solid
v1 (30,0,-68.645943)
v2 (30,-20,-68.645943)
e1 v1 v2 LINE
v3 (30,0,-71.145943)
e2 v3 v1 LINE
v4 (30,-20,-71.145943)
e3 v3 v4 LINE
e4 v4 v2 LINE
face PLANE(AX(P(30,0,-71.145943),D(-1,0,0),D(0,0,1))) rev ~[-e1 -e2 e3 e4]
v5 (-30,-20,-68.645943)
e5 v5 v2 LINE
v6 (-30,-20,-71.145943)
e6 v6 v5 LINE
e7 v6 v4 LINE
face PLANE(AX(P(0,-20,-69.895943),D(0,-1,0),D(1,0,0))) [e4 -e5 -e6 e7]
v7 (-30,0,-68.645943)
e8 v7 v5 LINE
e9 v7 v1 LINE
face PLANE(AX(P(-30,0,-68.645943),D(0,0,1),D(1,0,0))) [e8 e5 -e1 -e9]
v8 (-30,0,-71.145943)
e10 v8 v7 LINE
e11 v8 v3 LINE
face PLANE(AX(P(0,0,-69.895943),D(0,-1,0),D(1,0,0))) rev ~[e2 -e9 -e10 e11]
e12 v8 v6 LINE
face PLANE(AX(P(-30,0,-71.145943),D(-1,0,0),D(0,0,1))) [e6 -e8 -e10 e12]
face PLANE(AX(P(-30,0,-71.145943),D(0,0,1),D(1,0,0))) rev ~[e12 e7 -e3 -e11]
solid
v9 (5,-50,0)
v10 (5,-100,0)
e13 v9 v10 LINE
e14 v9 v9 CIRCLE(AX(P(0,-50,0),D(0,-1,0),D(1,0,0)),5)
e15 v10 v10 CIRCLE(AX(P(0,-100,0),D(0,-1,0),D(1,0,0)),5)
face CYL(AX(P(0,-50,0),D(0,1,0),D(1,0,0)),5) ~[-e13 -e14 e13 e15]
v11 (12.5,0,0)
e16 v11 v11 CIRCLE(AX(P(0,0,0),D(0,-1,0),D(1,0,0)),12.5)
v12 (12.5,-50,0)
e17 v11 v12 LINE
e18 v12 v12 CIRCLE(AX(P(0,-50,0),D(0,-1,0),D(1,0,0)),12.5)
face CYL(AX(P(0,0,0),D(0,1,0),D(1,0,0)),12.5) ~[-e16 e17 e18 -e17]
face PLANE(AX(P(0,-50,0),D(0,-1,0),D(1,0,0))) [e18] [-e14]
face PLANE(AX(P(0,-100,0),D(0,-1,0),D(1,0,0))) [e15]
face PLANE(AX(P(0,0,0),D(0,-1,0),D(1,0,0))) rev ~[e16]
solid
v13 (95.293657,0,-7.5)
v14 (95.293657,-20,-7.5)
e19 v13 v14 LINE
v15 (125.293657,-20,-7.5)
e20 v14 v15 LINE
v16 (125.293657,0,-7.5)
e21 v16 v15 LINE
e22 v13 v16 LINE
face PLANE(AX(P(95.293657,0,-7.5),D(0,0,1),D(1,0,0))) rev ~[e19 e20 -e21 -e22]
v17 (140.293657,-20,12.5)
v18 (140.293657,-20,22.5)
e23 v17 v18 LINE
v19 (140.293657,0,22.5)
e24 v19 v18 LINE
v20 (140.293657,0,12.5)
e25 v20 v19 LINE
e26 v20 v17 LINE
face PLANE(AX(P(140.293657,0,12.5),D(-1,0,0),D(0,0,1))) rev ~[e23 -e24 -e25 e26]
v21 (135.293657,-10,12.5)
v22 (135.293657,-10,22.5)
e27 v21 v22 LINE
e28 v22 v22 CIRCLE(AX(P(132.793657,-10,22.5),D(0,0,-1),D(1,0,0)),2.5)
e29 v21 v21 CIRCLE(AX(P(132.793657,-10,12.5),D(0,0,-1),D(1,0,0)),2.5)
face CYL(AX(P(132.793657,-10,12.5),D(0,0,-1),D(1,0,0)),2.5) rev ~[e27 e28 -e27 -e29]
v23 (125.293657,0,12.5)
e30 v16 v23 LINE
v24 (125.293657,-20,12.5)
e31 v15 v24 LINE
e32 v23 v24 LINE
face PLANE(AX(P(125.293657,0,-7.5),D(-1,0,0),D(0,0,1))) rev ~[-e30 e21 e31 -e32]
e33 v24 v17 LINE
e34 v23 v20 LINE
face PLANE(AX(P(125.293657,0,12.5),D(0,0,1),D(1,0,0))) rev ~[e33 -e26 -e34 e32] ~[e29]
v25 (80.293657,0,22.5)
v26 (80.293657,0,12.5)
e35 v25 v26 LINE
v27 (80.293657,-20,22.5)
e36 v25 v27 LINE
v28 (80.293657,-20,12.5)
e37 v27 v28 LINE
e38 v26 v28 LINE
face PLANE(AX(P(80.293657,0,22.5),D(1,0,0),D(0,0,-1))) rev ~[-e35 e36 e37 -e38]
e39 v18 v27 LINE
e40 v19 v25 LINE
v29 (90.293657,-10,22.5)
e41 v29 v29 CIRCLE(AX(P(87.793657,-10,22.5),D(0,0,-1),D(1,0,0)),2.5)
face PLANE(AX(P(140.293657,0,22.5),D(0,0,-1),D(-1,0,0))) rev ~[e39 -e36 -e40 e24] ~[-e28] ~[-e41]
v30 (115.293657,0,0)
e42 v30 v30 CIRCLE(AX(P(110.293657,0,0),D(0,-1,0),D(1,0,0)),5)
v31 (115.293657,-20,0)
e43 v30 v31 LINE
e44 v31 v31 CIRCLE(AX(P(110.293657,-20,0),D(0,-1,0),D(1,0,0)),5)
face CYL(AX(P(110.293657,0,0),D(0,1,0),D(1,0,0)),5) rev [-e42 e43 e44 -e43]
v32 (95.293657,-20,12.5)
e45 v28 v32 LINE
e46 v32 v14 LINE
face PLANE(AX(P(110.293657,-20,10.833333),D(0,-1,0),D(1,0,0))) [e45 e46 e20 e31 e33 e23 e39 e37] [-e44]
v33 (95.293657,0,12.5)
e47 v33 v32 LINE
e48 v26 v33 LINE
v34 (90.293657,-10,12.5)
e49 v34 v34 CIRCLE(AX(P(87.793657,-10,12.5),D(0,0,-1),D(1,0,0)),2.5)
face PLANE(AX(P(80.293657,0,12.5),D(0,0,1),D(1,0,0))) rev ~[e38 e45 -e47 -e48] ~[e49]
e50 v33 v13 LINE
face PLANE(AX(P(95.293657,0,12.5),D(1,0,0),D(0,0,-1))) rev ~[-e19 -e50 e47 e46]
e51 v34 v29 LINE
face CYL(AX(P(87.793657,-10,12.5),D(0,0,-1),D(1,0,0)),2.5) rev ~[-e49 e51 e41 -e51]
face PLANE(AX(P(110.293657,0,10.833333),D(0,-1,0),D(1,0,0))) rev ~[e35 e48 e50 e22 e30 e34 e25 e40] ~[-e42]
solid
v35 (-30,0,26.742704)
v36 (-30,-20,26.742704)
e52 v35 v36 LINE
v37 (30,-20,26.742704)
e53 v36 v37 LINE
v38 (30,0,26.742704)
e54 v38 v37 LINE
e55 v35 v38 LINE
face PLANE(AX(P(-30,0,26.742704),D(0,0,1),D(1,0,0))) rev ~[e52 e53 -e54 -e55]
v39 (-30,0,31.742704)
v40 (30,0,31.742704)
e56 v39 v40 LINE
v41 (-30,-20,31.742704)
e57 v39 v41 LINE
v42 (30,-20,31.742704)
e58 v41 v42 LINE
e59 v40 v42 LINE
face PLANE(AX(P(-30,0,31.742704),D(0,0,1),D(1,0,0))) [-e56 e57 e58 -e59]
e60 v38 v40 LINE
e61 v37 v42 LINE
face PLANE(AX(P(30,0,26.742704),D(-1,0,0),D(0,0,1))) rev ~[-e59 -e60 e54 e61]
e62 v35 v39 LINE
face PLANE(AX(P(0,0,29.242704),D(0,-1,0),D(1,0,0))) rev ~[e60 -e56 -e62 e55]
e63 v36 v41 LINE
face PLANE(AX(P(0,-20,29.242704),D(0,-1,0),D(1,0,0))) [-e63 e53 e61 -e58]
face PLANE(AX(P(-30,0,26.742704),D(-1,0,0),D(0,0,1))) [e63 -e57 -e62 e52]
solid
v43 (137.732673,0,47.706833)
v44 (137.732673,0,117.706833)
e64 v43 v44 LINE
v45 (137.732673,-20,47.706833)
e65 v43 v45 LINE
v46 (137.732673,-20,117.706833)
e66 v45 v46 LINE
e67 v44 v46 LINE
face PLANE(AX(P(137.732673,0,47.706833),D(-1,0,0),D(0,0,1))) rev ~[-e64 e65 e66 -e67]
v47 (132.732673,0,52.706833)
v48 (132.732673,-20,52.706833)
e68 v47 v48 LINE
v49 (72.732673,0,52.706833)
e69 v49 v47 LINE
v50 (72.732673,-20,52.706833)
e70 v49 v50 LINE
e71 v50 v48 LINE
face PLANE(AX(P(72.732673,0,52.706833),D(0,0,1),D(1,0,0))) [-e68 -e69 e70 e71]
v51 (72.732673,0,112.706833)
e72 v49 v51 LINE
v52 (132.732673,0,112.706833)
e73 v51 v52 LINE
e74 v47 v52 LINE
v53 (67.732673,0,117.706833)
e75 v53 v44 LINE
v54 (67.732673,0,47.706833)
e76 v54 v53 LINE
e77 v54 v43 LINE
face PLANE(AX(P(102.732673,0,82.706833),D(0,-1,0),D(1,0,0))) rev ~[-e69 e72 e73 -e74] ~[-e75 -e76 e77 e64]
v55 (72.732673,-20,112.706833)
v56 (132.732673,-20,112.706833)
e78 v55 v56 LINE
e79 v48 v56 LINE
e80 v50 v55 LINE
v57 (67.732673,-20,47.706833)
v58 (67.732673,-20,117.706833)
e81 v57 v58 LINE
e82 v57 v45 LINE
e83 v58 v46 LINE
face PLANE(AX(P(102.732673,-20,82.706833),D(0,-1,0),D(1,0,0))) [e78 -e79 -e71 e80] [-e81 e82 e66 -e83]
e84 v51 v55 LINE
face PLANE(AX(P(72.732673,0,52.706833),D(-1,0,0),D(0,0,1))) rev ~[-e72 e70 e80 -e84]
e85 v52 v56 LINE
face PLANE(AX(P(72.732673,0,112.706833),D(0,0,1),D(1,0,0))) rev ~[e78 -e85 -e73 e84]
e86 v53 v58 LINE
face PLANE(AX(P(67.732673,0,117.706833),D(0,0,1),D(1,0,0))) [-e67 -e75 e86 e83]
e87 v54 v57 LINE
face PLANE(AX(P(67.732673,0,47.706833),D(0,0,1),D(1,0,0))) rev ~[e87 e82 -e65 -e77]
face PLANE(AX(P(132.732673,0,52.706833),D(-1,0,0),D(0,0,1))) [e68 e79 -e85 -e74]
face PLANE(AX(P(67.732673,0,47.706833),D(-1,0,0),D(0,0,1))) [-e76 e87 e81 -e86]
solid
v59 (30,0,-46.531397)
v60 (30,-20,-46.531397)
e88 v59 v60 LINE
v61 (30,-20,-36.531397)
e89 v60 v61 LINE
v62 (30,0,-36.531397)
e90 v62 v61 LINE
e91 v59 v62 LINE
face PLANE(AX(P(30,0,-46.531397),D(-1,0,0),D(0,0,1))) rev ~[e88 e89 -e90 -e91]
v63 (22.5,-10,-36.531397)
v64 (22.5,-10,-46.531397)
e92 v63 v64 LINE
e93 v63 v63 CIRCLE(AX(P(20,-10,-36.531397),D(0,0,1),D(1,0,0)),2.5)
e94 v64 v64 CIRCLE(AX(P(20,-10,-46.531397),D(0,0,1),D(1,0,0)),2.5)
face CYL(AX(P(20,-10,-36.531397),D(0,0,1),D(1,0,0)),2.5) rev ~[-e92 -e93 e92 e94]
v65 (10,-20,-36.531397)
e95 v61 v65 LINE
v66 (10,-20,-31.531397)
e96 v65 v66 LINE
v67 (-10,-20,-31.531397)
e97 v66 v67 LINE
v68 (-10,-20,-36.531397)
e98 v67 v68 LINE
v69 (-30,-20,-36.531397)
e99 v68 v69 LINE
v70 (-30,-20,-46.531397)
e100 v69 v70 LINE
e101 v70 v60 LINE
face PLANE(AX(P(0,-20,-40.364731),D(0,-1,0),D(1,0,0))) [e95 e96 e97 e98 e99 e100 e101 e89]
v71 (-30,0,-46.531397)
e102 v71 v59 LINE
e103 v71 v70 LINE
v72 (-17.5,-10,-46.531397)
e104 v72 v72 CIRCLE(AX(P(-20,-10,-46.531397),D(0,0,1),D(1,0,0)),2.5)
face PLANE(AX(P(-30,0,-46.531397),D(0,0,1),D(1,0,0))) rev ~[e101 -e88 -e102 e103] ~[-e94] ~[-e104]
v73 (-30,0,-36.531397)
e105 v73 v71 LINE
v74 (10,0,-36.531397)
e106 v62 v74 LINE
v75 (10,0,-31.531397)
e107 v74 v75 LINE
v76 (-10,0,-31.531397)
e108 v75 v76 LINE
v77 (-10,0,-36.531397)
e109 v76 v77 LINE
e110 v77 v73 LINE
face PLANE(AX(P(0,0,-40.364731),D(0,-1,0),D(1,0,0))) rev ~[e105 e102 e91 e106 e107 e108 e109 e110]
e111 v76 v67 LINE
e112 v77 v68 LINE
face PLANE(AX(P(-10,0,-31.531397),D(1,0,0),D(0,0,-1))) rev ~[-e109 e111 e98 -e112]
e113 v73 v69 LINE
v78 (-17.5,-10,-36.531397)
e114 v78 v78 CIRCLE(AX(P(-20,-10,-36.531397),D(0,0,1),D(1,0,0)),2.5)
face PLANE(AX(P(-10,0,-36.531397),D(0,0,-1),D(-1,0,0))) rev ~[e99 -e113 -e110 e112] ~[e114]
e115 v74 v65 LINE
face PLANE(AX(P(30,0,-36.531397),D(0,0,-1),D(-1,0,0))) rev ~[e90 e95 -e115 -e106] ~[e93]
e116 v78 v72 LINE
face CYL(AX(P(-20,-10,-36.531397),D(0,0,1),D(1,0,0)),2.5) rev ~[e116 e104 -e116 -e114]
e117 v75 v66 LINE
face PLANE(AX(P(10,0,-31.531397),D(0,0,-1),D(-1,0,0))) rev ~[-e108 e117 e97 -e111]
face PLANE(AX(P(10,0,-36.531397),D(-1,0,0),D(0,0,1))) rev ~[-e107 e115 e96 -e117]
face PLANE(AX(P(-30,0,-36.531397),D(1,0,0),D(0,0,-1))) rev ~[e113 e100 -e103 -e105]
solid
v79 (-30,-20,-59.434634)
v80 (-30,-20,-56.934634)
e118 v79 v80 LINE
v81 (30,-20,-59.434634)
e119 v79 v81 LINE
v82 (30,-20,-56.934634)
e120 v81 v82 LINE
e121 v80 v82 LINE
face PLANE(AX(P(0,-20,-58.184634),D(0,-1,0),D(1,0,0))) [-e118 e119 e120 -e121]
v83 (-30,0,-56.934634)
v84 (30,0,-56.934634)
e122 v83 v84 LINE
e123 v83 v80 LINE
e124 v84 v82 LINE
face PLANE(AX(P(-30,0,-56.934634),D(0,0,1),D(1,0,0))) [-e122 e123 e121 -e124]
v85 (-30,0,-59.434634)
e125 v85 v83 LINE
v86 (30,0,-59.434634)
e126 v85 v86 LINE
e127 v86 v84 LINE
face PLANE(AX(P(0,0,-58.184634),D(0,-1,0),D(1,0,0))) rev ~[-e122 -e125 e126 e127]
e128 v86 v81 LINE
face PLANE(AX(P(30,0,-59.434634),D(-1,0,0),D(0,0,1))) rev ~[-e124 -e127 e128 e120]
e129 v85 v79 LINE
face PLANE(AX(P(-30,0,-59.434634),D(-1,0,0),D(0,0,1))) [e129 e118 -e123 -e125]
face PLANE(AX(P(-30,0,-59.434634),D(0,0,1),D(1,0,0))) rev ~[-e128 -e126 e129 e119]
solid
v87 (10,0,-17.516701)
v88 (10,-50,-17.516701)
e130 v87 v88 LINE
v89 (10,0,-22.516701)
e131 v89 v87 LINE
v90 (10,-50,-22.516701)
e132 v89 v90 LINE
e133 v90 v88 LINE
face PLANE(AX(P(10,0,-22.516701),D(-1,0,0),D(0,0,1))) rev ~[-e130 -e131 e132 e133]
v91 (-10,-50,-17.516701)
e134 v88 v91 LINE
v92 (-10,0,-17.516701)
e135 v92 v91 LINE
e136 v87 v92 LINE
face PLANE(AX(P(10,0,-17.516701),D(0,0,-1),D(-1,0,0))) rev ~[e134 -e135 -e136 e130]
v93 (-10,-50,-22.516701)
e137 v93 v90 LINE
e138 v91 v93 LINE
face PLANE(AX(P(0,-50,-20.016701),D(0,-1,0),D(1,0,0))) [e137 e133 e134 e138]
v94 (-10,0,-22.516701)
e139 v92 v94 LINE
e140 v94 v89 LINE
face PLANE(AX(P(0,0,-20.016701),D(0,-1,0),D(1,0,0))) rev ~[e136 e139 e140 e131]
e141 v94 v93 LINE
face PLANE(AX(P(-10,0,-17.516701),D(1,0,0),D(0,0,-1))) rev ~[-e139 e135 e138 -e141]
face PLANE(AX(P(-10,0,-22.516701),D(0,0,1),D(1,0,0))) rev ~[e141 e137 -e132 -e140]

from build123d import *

# Parameters (mm, degrees)
F0_R      = 5
F1_DEPTH  = 20
F0_W      = 60
F0_H      = 5
F0_W_2    = 70
F0_H_2    = 70
F0_H_3    = 60
F0_H_4    = 2.5
F0_R_2    = 12.5
F2_DEPTH  = 50
F3_R      = 5
F4_DEPTH  = 50
F5_DEPTH  = 50
F6_R      = 2.5
F7_R      = 2.5
F8_DEPTH  = 25
F10_R     = 2.5
F9_R      = 2.5
F11_DEPTH = 25


# Not quite as in the source:
# - a feature of the source that left no trace in its solid (it failed there, or was rolled back) is left out


with BuildPart() as f1:
    # F0 (on Front) → F1 (new body)
    with BuildSketch(Plane.XZ):
        Polygon((95.2936565876, -7.5), (110.2936565876, -7.5), (125.2936565876, -7.5), (125.2936565876, 12.5), (140.2936565876, 12.5), (140.2936565876, 22.5), (110.2936565876, 22.5), (80.2936565876, 22.5), (80.2936565876, 12.5), (95.2936565876, 12.5), align=None)
        with Locations((110.2936565876, 0)):
            Circle(F0_R, mode=Mode.SUBTRACT)
    extrude(amount=F1_DEPTH)

    # F10 (on face) + F9 (on face) → F11 (cut)
    with BuildSketch(Plane(origin=(0, 0, 12.5), x_dir=(1, 0, 0), z_dir=(0, 0, -1))):
        with Locations((87.7936565876, 10)):
            Circle(F10_R)
    with BuildSketch(Plane(origin=(0, 0, 12.5), x_dir=(1, 0, 0), z_dir=(0, 0, -1))):
        with Locations((132.7936565876, 10)):
            Circle(F9_R)
    extrude(amount=-F11_DEPTH, mode=Mode.SUBTRACT)


with BuildPart() as f1b:
    # F0 (on Front) → F1, piece 2 (new body)
    with BuildSketch(Plane.XZ):
        with Locations((0, 29.2427036911)):
            Rectangle(F0_W, F0_H)
    extrude(amount=F1_DEPTH)


with BuildPart() as f1c:
    # F0 (on Front) → F1, piece 3 (new body)
    with BuildSketch(Plane.XZ):
        Polygon((10, -31.5313972533), (0, -31.5313972533), (-10, -31.5313972533), (-10, -36.5313972533), (-30, -36.5313972533), (-30, -46.5313972533), (0, -46.5313972533), (30, -46.5313972533), (30, -36.5313972533), (10, -36.5313972533), align=None)
    extrude(amount=F1_DEPTH)

    # F6 (on face) + F7 (on face) → F8 (cut)
    with BuildSketch(Plane.XY.offset(-36.5313972533)):
        with Locations((-20, -10)):
            Circle(F6_R)
    with BuildSketch(Plane.XY.offset(-36.5313972533)):
        with Locations((20, -10)):
            Circle(F7_R)
    extrude(amount=-F8_DEPTH, mode=Mode.SUBTRACT)


with BuildPart() as f1d:
    # F0 (on Front) → F1, piece 4 (new body)
    with BuildSketch(Plane.XZ):
        with Locations((102.7326732874, 82.7068325877)):
            Rectangle(F0_W_2, F0_H_2)
        with Locations((102.7326732874, 82.7068325877)):
            Rectangle(F0_W, F0_H_3, mode=Mode.SUBTRACT)
    extrude(amount=F1_DEPTH)


with BuildPart() as f1e:
    # F0 (on Front) → F1, piece 5 (new body)
    with BuildSketch(Plane.XZ):
        with Locations((0, -58.184633702)):
            Rectangle(F0_W, F0_H_4)
    extrude(amount=F1_DEPTH)


with BuildPart() as f1f:
    # F0 (on Front) → F1, piece 6 (new body)
    with BuildSketch(Plane.XZ):
        with Locations((0, -69.8959429562)):
            Rectangle(F0_W, F0_H_4)
    extrude(amount=F1_DEPTH)


with BuildPart() as f2:
    # F0 (on Front) → F2 (new body)
    with BuildSketch(Plane.XZ):
        Circle(F0_R_2)
    extrude(amount=F2_DEPTH)

    # F3 (on face) → F4 (join)
    with BuildSketch(Plane.XZ.offset(50)):
        Circle(F3_R)
    extrude(amount=F4_DEPTH)


with BuildPart() as f5:
    # F0 (on Front) → F5 (new body)
    with BuildSketch(Plane.XZ):
        Polygon((-10, -22.5167013705), (0, -22.5167013705), (10, -22.5167013705), (10, -17.5167013705), (0, -17.5167013705), (-10, -17.5167013705), align=None)
    extrude(amount=F5_DEPTH)


solid = Compound([f1.part, f1b.part, f1c.part, f1d.part, f1e.part, f1f.part, f2.part, f5.part])
